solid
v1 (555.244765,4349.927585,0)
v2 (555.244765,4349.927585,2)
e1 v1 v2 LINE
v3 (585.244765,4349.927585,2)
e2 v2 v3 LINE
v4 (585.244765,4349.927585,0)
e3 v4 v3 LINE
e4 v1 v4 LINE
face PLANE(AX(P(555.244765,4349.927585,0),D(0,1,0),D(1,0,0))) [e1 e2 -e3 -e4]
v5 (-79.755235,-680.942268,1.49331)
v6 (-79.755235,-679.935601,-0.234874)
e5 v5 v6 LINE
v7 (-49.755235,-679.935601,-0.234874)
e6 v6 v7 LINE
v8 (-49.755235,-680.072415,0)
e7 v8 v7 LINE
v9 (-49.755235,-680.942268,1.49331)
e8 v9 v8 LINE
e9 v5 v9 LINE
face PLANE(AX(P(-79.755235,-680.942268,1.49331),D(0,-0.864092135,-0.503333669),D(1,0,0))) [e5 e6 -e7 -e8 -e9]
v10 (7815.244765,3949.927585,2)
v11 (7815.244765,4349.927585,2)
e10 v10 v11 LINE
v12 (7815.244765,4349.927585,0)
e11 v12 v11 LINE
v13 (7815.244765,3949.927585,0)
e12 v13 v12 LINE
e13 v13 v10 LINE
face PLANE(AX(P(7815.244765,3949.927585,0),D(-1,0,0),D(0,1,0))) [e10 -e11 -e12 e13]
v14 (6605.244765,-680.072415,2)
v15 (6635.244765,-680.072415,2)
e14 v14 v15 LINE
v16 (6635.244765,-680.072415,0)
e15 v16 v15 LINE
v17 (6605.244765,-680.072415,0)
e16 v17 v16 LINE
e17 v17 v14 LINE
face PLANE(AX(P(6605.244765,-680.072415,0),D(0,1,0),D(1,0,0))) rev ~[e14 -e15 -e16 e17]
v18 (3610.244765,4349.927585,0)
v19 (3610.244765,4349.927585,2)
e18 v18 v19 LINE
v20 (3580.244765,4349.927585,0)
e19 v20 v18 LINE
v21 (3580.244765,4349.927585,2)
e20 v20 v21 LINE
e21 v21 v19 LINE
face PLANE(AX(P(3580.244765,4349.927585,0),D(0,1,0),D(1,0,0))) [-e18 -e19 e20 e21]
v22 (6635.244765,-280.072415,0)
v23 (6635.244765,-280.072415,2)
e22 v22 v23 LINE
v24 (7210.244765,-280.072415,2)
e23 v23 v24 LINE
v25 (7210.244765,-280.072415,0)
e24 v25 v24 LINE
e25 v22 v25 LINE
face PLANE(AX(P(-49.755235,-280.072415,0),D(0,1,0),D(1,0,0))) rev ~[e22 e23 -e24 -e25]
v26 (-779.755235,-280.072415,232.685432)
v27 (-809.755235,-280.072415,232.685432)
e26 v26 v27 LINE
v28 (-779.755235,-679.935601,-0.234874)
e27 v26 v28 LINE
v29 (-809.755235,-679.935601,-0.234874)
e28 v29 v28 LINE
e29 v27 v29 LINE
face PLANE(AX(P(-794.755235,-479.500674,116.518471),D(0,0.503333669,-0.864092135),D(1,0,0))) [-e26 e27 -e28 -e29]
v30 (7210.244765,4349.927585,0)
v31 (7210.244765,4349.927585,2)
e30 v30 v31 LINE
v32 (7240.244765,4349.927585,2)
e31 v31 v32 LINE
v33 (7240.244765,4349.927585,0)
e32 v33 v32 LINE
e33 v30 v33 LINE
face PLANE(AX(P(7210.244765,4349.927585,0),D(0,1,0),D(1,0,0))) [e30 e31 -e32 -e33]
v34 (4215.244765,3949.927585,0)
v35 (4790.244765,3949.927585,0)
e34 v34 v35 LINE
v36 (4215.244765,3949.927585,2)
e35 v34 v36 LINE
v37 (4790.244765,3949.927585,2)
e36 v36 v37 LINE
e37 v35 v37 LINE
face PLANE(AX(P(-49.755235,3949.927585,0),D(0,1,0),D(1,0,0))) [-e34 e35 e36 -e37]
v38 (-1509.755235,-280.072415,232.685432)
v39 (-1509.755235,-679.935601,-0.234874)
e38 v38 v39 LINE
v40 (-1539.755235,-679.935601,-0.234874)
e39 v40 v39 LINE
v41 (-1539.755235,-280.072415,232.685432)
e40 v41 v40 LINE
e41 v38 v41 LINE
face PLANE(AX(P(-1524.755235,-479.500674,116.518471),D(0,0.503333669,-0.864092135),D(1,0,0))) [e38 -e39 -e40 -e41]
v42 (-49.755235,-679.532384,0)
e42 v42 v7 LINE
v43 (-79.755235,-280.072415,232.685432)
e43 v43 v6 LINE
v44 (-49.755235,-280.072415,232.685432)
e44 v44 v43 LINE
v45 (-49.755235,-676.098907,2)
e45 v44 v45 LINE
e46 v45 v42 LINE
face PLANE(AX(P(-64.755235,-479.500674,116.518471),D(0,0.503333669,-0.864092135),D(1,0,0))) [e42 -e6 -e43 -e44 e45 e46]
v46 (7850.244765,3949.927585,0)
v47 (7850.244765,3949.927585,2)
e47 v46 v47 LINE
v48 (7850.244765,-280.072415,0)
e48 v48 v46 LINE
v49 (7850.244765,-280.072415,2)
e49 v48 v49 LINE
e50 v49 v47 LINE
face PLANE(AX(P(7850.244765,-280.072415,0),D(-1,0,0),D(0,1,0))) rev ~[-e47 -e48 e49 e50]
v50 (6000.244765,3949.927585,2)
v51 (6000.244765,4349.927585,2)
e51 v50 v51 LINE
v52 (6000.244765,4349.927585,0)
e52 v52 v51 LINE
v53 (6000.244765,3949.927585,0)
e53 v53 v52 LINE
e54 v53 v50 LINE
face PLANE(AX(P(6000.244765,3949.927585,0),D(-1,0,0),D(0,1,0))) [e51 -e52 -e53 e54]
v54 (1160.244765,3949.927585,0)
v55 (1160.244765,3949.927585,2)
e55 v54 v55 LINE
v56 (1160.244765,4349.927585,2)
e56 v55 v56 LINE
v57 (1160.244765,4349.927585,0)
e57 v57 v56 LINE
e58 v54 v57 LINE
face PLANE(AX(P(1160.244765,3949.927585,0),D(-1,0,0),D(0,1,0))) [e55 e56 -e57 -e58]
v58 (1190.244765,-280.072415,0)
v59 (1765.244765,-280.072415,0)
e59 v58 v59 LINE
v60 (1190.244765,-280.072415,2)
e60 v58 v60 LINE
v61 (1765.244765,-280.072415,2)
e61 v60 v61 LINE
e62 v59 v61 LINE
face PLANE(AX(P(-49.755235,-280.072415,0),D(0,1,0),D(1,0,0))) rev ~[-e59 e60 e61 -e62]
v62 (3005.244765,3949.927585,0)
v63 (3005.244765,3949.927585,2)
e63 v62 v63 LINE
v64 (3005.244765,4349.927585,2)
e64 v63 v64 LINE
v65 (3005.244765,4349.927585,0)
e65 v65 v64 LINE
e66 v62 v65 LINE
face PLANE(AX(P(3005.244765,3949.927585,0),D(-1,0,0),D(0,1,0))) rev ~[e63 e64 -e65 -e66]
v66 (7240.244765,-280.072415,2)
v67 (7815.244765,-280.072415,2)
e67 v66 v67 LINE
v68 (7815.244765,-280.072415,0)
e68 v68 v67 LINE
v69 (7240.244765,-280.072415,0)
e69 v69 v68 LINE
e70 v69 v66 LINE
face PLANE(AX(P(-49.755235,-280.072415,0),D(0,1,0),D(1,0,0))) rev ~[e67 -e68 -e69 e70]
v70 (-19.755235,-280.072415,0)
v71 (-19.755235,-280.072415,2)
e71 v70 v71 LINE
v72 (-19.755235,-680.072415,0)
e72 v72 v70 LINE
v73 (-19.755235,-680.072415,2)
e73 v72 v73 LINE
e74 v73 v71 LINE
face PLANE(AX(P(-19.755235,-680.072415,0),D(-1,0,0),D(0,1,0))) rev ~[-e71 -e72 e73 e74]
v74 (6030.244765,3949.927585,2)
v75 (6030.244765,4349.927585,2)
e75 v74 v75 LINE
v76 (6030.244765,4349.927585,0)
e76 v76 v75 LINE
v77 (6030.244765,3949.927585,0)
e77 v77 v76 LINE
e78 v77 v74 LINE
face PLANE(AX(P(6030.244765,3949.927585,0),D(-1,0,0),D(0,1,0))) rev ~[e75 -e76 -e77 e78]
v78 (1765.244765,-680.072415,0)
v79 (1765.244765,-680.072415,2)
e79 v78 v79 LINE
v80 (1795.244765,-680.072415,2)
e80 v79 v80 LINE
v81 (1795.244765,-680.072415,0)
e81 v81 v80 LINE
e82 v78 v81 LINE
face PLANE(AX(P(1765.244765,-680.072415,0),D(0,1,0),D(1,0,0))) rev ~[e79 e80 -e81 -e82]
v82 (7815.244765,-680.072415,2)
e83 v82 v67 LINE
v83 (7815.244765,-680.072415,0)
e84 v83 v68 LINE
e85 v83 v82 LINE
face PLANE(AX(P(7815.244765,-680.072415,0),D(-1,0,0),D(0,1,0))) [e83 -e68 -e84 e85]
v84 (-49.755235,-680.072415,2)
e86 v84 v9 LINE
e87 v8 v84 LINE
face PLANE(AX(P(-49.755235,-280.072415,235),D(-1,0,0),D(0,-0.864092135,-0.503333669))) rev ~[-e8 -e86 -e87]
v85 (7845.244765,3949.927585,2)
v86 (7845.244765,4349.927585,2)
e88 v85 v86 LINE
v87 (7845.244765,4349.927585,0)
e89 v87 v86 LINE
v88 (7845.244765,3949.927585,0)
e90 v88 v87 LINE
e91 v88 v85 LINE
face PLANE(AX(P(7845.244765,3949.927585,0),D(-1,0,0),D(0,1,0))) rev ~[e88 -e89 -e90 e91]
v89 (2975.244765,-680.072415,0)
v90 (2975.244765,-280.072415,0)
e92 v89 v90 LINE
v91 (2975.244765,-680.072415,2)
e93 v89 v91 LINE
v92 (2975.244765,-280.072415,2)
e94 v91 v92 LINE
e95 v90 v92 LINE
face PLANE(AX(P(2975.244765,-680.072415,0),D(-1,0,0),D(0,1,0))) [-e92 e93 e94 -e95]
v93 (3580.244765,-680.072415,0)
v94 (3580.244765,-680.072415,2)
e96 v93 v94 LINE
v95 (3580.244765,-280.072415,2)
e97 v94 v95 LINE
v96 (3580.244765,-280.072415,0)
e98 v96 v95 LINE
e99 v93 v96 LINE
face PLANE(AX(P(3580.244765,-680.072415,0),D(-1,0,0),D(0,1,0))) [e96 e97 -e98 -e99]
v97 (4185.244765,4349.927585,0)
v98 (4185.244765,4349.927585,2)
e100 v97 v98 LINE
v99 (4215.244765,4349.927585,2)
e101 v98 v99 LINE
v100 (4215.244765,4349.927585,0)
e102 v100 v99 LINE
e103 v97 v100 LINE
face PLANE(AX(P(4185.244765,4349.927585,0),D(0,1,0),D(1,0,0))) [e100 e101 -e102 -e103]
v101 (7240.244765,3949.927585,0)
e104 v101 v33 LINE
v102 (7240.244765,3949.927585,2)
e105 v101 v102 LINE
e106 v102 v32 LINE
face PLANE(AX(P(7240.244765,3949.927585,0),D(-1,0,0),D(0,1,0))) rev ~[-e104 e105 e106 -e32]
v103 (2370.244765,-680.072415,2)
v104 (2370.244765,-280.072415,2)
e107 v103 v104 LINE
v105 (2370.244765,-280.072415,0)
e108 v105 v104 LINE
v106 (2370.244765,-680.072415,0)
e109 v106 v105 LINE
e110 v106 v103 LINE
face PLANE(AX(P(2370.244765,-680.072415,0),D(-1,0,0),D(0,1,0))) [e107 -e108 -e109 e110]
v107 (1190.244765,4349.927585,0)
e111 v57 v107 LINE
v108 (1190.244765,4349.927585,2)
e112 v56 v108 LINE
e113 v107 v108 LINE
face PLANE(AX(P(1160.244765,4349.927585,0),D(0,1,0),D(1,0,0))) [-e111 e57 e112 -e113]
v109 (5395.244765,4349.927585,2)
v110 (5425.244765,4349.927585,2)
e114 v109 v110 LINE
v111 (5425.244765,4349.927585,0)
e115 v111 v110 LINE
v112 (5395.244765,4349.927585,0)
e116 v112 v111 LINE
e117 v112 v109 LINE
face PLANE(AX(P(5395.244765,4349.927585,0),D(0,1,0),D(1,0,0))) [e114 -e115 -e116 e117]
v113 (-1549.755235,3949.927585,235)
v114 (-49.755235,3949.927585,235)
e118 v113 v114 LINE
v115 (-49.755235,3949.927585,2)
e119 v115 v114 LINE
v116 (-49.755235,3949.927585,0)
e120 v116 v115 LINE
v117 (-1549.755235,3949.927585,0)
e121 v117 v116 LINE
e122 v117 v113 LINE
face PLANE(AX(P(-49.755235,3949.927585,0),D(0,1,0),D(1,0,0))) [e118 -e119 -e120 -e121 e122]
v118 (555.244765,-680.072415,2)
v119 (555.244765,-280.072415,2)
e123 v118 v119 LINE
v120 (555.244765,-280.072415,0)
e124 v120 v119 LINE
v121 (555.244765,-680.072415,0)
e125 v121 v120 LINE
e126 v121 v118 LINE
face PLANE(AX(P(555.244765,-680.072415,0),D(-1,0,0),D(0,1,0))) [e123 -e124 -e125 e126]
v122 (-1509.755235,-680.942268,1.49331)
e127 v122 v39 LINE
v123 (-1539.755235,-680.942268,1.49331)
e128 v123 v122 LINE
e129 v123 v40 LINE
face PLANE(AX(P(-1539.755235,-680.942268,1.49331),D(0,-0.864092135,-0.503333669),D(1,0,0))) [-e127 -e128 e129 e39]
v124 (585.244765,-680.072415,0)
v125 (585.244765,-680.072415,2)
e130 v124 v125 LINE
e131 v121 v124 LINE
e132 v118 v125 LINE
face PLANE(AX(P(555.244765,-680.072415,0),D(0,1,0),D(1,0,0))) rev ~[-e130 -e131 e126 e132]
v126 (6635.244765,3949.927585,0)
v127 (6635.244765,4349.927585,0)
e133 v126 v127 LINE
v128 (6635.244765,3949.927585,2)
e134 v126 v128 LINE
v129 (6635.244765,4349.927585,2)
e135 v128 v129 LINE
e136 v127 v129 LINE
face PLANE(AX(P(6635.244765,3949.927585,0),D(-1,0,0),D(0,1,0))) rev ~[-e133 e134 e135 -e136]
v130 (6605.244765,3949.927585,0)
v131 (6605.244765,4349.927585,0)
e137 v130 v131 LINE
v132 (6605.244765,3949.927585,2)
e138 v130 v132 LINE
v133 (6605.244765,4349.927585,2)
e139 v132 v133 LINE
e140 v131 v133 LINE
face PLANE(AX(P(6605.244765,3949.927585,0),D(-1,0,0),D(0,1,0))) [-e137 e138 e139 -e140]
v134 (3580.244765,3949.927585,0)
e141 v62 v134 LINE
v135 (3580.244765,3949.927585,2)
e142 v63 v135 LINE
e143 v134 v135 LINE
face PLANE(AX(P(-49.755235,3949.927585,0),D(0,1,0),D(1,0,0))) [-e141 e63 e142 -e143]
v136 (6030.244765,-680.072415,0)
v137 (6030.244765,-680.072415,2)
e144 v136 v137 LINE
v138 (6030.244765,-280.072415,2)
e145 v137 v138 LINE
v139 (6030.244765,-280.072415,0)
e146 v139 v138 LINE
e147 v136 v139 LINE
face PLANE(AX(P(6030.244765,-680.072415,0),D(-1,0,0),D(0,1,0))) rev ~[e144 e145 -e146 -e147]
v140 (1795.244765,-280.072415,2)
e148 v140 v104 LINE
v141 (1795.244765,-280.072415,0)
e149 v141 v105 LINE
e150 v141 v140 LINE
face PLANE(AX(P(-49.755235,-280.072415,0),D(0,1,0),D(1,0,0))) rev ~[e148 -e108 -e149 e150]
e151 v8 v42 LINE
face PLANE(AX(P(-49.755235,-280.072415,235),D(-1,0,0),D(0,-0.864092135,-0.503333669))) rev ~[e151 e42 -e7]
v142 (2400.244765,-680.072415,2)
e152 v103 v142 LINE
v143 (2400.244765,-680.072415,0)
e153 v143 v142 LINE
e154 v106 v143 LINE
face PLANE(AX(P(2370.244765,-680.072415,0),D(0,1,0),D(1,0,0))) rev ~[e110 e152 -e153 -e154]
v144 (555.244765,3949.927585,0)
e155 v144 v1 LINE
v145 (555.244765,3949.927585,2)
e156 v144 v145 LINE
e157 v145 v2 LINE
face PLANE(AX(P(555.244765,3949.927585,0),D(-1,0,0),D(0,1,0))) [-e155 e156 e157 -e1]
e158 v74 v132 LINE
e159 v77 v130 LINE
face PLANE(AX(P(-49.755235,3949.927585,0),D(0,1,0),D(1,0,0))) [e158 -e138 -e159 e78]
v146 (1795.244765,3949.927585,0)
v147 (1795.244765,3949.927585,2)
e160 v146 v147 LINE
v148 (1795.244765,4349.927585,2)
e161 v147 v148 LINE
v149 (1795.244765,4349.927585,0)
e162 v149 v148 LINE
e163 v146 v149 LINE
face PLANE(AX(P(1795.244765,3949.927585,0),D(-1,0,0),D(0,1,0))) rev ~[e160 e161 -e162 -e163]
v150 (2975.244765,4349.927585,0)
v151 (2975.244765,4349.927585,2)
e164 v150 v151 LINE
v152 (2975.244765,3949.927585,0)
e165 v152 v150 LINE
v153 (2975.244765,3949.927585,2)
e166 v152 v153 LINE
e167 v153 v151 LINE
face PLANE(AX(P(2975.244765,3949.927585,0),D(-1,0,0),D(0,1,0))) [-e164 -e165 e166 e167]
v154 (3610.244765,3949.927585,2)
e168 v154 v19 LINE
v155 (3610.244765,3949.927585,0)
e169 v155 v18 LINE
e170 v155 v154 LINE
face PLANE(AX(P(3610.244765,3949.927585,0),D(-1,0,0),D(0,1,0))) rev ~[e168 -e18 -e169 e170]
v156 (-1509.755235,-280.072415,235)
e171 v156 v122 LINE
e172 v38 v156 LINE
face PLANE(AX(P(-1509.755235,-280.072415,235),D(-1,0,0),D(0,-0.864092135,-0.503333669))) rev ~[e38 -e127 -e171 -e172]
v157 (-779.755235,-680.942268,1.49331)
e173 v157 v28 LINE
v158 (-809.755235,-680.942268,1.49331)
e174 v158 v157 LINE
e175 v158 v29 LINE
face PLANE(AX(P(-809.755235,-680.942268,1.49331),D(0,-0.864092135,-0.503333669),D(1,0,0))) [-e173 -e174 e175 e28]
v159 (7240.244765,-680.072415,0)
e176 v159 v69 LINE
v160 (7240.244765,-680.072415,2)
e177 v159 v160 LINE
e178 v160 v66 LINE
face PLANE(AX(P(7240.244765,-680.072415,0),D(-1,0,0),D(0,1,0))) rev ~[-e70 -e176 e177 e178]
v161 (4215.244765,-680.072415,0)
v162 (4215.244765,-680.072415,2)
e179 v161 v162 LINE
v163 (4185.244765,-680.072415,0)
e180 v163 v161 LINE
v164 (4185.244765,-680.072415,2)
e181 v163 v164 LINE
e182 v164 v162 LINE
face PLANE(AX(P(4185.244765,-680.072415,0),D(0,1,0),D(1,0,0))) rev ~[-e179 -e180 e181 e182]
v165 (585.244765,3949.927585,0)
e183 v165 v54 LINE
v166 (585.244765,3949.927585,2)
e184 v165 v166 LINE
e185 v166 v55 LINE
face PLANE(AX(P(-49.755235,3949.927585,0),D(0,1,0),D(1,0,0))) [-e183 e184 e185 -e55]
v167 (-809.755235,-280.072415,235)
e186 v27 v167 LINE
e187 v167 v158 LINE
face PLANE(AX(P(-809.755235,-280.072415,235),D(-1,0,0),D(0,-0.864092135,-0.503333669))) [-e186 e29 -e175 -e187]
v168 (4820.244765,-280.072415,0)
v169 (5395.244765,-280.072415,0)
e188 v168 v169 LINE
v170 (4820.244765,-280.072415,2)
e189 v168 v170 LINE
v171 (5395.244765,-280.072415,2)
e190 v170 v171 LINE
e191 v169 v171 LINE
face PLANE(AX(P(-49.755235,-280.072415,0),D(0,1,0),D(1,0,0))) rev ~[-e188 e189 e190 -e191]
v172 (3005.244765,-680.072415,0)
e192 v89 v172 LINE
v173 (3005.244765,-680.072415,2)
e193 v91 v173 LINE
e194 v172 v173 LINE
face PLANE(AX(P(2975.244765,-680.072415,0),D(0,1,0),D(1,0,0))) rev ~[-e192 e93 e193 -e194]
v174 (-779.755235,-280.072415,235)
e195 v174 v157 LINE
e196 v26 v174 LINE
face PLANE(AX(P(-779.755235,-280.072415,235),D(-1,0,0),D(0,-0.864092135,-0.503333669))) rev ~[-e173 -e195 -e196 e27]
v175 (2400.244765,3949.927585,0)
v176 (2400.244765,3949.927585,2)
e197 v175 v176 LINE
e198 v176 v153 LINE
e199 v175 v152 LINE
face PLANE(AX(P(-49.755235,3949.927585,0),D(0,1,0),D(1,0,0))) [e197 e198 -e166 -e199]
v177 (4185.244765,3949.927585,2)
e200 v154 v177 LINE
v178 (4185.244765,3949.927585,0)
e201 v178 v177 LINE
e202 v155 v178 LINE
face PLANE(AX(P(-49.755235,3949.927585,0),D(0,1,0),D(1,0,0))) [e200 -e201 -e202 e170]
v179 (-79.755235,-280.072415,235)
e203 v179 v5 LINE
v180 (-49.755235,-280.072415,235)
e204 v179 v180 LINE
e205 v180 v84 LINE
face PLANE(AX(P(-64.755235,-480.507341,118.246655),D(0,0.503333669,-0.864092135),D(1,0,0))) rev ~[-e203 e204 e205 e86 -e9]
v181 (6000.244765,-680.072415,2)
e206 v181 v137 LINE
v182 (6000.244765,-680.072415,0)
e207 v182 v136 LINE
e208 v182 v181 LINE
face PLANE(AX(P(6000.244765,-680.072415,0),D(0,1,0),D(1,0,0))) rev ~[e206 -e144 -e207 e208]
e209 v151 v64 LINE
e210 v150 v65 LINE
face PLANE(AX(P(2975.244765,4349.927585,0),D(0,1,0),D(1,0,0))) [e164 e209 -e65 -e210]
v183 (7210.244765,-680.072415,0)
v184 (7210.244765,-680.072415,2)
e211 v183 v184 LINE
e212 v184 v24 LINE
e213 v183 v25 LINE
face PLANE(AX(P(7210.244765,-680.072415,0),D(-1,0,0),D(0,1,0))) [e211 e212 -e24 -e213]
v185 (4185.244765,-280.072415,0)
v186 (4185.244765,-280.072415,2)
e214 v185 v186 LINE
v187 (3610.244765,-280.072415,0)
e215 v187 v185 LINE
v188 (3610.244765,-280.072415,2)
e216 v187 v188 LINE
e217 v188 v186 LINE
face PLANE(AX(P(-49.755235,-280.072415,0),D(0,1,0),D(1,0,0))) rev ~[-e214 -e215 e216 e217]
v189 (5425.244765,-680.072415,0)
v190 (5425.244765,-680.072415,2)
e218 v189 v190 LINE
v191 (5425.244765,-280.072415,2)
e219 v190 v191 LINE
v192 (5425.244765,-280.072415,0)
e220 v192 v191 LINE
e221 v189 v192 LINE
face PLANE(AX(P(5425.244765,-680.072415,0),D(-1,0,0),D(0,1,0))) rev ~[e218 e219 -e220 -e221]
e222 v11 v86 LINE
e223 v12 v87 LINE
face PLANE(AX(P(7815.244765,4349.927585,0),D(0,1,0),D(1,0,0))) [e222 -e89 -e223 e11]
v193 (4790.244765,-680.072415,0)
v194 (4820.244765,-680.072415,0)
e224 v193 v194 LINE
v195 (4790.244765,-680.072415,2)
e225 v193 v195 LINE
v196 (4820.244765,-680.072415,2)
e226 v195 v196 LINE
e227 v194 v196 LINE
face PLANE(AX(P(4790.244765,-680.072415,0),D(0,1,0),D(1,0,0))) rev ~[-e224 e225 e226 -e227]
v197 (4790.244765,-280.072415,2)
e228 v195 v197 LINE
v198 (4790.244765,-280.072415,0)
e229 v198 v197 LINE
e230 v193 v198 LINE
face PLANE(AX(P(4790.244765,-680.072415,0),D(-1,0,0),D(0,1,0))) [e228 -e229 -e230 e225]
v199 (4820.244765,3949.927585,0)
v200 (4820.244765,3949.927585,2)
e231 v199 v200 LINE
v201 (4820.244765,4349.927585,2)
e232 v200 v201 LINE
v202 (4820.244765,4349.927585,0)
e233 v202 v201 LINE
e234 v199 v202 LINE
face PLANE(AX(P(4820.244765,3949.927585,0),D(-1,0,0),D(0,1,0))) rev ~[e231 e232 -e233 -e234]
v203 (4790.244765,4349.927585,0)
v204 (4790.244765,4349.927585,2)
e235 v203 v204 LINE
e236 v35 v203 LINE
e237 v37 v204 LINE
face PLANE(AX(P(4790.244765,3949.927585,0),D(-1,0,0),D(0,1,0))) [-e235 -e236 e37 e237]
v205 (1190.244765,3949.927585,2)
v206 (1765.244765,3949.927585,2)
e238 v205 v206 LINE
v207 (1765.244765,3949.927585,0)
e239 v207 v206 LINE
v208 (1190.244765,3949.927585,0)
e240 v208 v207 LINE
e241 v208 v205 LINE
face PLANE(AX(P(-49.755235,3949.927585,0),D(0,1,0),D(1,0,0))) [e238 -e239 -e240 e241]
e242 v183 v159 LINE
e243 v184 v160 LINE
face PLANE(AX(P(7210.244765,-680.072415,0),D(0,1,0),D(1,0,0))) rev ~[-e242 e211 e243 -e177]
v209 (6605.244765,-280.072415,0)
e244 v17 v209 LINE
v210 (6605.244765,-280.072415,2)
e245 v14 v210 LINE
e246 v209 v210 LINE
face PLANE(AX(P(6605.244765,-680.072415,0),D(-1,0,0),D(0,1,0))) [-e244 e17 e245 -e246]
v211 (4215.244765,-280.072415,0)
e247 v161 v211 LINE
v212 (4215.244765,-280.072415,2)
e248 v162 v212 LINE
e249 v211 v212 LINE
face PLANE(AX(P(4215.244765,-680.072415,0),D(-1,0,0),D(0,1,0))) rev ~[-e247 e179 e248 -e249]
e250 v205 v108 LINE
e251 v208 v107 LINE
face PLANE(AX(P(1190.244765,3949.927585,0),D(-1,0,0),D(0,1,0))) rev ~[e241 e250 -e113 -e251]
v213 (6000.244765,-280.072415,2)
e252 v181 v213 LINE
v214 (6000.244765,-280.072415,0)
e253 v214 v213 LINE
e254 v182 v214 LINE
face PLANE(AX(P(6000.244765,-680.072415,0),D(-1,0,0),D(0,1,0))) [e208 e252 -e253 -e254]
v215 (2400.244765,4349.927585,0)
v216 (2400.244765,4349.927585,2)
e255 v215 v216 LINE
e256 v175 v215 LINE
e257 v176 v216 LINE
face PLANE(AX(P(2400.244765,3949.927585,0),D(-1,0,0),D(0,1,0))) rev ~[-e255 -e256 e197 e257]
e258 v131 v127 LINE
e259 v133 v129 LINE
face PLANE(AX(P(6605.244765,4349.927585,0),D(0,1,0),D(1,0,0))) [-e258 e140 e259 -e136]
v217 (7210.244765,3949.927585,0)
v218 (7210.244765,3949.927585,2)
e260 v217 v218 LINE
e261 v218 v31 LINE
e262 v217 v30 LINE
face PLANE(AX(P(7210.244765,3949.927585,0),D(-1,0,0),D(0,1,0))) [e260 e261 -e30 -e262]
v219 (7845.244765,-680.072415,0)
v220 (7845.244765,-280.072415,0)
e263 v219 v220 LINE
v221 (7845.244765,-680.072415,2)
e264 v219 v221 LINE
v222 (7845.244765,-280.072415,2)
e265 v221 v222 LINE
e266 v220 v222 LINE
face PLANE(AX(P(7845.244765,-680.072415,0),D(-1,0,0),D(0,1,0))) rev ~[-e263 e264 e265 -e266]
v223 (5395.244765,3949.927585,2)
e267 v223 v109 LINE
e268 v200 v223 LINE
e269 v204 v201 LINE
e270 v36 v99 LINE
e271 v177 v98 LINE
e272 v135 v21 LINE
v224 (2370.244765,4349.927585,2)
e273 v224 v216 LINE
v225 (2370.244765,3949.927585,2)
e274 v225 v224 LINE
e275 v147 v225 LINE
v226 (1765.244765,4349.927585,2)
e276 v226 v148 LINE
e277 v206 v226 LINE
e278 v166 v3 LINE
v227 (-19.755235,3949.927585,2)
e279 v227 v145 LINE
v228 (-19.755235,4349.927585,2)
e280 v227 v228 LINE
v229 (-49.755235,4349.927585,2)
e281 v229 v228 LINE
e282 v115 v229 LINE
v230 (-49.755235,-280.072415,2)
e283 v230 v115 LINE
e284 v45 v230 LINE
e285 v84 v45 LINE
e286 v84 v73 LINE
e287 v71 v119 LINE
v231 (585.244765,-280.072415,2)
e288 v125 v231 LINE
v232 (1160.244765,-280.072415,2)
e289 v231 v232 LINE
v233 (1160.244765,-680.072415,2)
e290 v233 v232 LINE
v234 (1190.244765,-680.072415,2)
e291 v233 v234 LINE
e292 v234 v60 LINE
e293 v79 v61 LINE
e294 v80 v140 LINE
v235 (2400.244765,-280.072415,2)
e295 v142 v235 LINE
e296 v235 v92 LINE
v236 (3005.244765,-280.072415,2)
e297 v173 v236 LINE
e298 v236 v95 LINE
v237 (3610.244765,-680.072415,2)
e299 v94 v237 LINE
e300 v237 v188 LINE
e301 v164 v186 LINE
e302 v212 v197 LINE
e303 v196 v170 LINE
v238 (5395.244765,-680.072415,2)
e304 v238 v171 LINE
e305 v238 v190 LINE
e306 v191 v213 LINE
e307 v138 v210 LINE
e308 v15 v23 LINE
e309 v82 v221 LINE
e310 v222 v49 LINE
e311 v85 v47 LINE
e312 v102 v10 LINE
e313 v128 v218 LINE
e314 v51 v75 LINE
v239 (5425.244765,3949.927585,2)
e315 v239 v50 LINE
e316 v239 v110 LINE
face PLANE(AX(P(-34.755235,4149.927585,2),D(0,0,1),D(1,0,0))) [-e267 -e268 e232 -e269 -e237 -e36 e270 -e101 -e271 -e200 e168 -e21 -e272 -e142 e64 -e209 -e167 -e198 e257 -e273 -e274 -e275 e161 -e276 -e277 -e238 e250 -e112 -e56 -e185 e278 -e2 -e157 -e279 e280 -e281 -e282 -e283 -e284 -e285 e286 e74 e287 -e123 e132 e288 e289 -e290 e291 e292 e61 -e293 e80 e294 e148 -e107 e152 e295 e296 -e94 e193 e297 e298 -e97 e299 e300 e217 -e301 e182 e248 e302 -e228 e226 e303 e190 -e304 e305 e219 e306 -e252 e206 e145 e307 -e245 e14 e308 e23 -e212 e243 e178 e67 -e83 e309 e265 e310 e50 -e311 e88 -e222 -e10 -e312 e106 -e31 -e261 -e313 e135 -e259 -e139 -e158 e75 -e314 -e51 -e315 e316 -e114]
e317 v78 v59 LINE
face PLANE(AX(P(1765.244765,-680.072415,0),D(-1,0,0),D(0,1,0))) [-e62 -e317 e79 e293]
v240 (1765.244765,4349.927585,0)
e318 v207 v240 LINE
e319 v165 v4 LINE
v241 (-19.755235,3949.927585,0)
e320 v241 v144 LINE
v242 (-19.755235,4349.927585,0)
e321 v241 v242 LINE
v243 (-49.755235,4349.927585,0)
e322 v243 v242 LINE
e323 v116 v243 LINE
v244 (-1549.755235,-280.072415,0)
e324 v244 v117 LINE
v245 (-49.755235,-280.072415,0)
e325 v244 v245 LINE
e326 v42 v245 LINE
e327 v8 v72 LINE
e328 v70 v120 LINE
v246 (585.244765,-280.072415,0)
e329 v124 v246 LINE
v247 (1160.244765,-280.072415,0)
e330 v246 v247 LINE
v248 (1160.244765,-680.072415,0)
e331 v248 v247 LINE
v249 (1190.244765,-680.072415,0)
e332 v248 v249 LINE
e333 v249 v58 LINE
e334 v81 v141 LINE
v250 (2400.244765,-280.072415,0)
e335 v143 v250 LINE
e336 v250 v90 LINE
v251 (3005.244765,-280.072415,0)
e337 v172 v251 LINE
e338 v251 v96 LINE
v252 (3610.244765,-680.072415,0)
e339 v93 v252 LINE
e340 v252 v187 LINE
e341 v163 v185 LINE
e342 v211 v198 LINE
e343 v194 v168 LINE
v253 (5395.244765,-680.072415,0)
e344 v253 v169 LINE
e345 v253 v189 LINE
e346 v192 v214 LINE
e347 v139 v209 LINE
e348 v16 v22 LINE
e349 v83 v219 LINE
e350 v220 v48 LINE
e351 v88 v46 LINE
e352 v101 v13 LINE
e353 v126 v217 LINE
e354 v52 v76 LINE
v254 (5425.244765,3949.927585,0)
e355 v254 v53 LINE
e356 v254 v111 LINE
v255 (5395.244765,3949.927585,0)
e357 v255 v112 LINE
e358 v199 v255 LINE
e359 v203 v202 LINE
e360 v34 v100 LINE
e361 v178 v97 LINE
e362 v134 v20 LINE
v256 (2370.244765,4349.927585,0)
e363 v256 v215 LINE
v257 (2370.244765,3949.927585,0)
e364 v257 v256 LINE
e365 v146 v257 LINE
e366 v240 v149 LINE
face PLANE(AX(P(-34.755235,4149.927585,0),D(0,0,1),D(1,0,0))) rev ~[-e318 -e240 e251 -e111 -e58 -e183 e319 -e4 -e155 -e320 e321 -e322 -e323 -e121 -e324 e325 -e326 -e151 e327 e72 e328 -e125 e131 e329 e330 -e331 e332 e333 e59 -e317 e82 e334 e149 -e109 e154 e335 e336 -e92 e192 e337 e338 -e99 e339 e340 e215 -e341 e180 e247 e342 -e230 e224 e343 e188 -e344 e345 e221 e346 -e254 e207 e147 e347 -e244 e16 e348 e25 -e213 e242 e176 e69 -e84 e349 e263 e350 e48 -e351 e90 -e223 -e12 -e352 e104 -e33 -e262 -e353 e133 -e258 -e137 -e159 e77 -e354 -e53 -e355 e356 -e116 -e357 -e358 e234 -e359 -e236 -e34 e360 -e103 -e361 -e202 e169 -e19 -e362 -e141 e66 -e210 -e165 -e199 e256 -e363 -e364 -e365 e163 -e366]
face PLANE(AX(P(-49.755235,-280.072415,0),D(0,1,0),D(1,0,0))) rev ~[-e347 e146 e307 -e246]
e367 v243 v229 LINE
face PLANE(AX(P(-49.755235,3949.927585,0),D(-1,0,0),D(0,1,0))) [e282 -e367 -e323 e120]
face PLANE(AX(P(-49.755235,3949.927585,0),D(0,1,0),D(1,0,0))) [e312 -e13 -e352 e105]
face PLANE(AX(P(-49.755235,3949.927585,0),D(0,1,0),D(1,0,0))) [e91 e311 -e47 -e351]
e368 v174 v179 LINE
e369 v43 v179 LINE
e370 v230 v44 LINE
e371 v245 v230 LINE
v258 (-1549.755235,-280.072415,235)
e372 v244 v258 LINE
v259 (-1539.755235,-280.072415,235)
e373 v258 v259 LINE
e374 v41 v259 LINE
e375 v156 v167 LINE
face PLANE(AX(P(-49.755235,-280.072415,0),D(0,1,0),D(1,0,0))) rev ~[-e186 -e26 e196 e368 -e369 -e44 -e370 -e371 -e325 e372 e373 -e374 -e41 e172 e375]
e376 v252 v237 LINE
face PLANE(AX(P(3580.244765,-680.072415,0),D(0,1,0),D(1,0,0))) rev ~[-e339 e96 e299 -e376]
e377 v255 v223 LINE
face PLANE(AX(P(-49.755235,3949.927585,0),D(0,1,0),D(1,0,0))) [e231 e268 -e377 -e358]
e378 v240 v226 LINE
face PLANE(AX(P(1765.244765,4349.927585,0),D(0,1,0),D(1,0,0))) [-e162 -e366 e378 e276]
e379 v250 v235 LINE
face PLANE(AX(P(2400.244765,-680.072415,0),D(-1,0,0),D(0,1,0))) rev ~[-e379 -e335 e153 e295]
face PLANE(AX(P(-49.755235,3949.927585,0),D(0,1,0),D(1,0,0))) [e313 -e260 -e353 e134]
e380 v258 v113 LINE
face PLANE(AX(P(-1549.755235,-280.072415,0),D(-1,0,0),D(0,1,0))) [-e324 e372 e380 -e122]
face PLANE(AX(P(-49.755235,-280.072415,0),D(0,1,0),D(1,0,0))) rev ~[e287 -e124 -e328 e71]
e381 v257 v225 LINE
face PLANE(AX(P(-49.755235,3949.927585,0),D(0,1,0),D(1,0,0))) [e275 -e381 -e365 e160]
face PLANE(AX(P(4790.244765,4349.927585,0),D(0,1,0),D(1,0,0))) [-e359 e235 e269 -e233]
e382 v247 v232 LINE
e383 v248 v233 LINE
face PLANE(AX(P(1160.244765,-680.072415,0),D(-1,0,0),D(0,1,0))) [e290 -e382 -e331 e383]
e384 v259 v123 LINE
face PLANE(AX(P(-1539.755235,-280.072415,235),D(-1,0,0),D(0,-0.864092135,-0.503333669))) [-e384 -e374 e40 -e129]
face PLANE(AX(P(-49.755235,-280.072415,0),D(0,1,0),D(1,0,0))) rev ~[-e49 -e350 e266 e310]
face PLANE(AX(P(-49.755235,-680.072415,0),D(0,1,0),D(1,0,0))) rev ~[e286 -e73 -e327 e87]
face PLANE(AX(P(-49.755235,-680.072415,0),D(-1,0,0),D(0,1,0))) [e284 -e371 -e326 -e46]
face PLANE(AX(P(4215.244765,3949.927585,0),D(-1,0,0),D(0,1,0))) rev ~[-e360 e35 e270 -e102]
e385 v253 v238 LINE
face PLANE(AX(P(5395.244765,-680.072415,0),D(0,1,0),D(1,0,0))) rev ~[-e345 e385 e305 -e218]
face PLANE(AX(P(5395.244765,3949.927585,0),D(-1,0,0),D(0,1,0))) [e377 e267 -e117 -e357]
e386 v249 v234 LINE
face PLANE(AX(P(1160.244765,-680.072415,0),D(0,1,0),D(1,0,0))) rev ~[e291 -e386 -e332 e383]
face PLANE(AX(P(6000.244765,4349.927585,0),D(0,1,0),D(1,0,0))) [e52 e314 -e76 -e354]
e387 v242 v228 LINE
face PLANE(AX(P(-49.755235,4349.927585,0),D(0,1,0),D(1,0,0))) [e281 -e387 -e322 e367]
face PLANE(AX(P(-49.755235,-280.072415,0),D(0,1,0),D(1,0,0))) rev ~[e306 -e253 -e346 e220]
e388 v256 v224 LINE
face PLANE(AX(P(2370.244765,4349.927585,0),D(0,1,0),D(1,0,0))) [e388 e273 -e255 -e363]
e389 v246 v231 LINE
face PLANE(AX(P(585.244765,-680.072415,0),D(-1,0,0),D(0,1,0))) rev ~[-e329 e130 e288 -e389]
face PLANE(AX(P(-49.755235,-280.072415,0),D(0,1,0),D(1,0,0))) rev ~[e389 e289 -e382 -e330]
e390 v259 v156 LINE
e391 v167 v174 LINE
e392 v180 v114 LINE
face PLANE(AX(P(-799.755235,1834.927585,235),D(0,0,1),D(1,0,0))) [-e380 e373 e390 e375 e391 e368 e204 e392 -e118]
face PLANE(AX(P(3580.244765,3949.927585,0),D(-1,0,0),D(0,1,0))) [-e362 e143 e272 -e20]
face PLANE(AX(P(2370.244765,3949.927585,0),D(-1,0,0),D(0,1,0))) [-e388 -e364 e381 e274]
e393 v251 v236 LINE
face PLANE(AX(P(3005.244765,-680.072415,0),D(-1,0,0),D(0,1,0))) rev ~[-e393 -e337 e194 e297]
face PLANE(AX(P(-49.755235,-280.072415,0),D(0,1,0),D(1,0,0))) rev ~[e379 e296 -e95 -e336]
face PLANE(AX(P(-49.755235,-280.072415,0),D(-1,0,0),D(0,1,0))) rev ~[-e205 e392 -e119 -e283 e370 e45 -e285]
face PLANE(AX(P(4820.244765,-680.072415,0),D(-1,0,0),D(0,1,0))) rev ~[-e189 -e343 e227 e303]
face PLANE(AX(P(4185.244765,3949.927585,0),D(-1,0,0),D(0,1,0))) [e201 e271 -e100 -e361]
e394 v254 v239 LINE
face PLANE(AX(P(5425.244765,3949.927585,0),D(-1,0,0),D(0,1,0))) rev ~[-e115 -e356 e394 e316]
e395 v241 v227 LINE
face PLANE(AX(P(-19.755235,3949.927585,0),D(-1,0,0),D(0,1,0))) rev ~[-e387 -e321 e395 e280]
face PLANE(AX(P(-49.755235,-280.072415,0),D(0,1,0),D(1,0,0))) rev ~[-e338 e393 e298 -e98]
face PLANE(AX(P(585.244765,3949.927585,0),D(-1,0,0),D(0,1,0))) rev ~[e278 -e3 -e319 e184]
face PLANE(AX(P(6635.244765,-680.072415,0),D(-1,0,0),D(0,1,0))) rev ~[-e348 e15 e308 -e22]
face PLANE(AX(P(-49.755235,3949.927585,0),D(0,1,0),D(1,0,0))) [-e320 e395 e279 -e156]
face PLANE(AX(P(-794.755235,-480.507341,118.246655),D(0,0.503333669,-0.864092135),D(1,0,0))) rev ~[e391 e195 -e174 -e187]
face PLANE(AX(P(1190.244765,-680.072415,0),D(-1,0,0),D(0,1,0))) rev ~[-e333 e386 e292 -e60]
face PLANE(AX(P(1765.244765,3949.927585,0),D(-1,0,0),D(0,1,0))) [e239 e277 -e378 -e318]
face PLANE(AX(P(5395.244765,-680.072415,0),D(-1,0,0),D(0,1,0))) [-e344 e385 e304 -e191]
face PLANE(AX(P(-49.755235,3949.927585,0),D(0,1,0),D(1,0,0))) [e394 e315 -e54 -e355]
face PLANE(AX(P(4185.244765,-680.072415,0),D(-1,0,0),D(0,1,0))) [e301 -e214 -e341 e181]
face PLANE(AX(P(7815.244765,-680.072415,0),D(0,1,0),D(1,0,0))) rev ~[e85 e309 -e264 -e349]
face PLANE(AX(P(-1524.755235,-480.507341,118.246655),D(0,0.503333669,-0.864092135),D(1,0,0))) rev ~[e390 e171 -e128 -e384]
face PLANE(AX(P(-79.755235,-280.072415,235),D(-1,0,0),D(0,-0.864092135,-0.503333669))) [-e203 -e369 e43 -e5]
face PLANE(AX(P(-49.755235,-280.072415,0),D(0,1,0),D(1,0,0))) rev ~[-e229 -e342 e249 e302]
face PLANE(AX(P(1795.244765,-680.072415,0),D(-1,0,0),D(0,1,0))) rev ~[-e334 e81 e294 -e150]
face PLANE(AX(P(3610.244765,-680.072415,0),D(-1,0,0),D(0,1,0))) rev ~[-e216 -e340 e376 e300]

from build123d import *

# Parameters (mm, degrees)
F0_W     = 1500
F0_H     = 4230
F1_DEPTH = 235
F2_W     = 7900
F2_H     = 4230
F3_DEPTH = 2
F4_W     = 30
F4_H     = 400
F5_DEPTH = 2
F7_W     = 30
F7_H     = 463.9202661871
F8_DEPTH = 2


with BuildPart() as f1:
    # F0 (on Top) → F1 (new body)
    with BuildSketch(Plane.XY):
        with Locations((-799.7552353144, 1834.9275854864)):
            Rectangle(F0_W, F0_H)
    extrude(amount=F1_DEPTH)

    # F2 (on Top) → F3 (join)
    with BuildSketch(Plane.XY):
        with Locations((3900.2447646856, 1834.9275854864)):
            Rectangle(F2_W, F2_H)
    extrude(amount=F3_DEPTH)

    # F4 (on Top) → F5 (join)
    with BuildSketch(Plane.XY):
        with Locations((-34.7552353144, 4149.9275854864)):
            Rectangle(F4_W, F4_H)
        with Locations((570.2447646856, 4149.9275854864)):
            Rectangle(F4_W, F4_H)
        with Locations((1175.2447646856, 4149.9275854864)):
            Rectangle(F4_W, F4_H)
        with Locations((1780.2447646856, 4149.9275854864)):
            Rectangle(F4_W, F4_H)
        with Locations((2385.2447646856, 4149.9275854864)):
            Rectangle(F4_W, F4_H)
        with Locations((2990.2447646856, 4149.9275854864)):
            Rectangle(F4_W, F4_H)
        with Locations((3595.2447646856, 4149.9275854864)):
            Rectangle(F4_W, F4_H)
        with Locations((4200.2447646856, 4149.9275854864)):
            Rectangle(F4_W, F4_H)
        with Locations((4805.2447646856, 4149.9275854864)):
            Rectangle(F4_W, F4_H)
        with Locations((5410.2447646856, 4149.9275854864)):
            Rectangle(F4_W, F4_H)
        with Locations((6015.2447646856, 4149.9275854864)):
            Rectangle(F4_W, F4_H)
        with Locations((6620.2447646856, 4149.9275854864)):
            Rectangle(F4_W, F4_H)
        with Locations((7225.2447646856, 4149.9275854864)):
            Rectangle(F4_W, F4_H)
        with Locations((7830.2447646856, 4149.9275854864)):
            Rectangle(F4_W, F4_H)
        with Locations((-34.7552353144, -480.0724145136)):
            Rectangle(F4_W, F4_H)
        with Locations((570.2447646856, -480.0724145136)):
            Rectangle(F4_W, F4_H)
        with Locations((1780.2447646856, -480.0724145136)):
            Rectangle(F4_W, F4_H)
        with Locations((7225.2447646856, -480.0724145136)):
            Rectangle(F4_W, F4_H)
        with Locations((4805.2447646856, -480.0724145136)):
            Rectangle(F4_W, F4_H)
        with Locations((3595.2447646856, -480.0724145136)):
            Rectangle(F4_W, F4_H)
        with Locations((2385.2447646856, -480.0724145136)):
            Rectangle(F4_W, F4_H)
        with Locations((5410.2447646856, -480.0724145136)):
            Rectangle(F4_W, F4_H)
        with Locations((7830.2447646856, -480.0724145136)):
            Rectangle(F4_W, F4_H)
        with Locations((6620.2447646856, -480.0724145136)):
            Rectangle(F4_W, F4_H)
        with Locations((6015.2447646856, -480.0724145136)):
            Rectangle(F4_W, F4_H)
        with Locations((2990.2447646856, -480.0724145136)):
            Rectangle(F4_W, F4_H)
        with Locations((4200.2447646856, -480.0724145136)):
            Rectangle(F4_W, F4_H)
        with Locations((1175.2447646856, -480.0724145136)):
            Rectangle(F4_W, F4_H)
    extrude(amount=F5_DEPTH)

    # F7 (on 3pt) → F8 (join)
    with BuildSketch(Plane(origin=(0, -173.1626509598, 297.2749372701), x_dir=(1, 0, 0), z_dir=(0, 0.5033336687, -0.8640921351))):
        with Locations((-64.7552353144, 355.6850915907)):
            Rectangle(F7_W, F7_H)
        with Locations((-794.7552353144, 355.6850915907)):
            Rectangle(F7_W, F7_H)
        with Locations((-1524.7552353144, 355.6850915907)):
            Rectangle(F7_W, F7_H)
    extrude(amount=F8_DEPTH)


solid = f1.part
